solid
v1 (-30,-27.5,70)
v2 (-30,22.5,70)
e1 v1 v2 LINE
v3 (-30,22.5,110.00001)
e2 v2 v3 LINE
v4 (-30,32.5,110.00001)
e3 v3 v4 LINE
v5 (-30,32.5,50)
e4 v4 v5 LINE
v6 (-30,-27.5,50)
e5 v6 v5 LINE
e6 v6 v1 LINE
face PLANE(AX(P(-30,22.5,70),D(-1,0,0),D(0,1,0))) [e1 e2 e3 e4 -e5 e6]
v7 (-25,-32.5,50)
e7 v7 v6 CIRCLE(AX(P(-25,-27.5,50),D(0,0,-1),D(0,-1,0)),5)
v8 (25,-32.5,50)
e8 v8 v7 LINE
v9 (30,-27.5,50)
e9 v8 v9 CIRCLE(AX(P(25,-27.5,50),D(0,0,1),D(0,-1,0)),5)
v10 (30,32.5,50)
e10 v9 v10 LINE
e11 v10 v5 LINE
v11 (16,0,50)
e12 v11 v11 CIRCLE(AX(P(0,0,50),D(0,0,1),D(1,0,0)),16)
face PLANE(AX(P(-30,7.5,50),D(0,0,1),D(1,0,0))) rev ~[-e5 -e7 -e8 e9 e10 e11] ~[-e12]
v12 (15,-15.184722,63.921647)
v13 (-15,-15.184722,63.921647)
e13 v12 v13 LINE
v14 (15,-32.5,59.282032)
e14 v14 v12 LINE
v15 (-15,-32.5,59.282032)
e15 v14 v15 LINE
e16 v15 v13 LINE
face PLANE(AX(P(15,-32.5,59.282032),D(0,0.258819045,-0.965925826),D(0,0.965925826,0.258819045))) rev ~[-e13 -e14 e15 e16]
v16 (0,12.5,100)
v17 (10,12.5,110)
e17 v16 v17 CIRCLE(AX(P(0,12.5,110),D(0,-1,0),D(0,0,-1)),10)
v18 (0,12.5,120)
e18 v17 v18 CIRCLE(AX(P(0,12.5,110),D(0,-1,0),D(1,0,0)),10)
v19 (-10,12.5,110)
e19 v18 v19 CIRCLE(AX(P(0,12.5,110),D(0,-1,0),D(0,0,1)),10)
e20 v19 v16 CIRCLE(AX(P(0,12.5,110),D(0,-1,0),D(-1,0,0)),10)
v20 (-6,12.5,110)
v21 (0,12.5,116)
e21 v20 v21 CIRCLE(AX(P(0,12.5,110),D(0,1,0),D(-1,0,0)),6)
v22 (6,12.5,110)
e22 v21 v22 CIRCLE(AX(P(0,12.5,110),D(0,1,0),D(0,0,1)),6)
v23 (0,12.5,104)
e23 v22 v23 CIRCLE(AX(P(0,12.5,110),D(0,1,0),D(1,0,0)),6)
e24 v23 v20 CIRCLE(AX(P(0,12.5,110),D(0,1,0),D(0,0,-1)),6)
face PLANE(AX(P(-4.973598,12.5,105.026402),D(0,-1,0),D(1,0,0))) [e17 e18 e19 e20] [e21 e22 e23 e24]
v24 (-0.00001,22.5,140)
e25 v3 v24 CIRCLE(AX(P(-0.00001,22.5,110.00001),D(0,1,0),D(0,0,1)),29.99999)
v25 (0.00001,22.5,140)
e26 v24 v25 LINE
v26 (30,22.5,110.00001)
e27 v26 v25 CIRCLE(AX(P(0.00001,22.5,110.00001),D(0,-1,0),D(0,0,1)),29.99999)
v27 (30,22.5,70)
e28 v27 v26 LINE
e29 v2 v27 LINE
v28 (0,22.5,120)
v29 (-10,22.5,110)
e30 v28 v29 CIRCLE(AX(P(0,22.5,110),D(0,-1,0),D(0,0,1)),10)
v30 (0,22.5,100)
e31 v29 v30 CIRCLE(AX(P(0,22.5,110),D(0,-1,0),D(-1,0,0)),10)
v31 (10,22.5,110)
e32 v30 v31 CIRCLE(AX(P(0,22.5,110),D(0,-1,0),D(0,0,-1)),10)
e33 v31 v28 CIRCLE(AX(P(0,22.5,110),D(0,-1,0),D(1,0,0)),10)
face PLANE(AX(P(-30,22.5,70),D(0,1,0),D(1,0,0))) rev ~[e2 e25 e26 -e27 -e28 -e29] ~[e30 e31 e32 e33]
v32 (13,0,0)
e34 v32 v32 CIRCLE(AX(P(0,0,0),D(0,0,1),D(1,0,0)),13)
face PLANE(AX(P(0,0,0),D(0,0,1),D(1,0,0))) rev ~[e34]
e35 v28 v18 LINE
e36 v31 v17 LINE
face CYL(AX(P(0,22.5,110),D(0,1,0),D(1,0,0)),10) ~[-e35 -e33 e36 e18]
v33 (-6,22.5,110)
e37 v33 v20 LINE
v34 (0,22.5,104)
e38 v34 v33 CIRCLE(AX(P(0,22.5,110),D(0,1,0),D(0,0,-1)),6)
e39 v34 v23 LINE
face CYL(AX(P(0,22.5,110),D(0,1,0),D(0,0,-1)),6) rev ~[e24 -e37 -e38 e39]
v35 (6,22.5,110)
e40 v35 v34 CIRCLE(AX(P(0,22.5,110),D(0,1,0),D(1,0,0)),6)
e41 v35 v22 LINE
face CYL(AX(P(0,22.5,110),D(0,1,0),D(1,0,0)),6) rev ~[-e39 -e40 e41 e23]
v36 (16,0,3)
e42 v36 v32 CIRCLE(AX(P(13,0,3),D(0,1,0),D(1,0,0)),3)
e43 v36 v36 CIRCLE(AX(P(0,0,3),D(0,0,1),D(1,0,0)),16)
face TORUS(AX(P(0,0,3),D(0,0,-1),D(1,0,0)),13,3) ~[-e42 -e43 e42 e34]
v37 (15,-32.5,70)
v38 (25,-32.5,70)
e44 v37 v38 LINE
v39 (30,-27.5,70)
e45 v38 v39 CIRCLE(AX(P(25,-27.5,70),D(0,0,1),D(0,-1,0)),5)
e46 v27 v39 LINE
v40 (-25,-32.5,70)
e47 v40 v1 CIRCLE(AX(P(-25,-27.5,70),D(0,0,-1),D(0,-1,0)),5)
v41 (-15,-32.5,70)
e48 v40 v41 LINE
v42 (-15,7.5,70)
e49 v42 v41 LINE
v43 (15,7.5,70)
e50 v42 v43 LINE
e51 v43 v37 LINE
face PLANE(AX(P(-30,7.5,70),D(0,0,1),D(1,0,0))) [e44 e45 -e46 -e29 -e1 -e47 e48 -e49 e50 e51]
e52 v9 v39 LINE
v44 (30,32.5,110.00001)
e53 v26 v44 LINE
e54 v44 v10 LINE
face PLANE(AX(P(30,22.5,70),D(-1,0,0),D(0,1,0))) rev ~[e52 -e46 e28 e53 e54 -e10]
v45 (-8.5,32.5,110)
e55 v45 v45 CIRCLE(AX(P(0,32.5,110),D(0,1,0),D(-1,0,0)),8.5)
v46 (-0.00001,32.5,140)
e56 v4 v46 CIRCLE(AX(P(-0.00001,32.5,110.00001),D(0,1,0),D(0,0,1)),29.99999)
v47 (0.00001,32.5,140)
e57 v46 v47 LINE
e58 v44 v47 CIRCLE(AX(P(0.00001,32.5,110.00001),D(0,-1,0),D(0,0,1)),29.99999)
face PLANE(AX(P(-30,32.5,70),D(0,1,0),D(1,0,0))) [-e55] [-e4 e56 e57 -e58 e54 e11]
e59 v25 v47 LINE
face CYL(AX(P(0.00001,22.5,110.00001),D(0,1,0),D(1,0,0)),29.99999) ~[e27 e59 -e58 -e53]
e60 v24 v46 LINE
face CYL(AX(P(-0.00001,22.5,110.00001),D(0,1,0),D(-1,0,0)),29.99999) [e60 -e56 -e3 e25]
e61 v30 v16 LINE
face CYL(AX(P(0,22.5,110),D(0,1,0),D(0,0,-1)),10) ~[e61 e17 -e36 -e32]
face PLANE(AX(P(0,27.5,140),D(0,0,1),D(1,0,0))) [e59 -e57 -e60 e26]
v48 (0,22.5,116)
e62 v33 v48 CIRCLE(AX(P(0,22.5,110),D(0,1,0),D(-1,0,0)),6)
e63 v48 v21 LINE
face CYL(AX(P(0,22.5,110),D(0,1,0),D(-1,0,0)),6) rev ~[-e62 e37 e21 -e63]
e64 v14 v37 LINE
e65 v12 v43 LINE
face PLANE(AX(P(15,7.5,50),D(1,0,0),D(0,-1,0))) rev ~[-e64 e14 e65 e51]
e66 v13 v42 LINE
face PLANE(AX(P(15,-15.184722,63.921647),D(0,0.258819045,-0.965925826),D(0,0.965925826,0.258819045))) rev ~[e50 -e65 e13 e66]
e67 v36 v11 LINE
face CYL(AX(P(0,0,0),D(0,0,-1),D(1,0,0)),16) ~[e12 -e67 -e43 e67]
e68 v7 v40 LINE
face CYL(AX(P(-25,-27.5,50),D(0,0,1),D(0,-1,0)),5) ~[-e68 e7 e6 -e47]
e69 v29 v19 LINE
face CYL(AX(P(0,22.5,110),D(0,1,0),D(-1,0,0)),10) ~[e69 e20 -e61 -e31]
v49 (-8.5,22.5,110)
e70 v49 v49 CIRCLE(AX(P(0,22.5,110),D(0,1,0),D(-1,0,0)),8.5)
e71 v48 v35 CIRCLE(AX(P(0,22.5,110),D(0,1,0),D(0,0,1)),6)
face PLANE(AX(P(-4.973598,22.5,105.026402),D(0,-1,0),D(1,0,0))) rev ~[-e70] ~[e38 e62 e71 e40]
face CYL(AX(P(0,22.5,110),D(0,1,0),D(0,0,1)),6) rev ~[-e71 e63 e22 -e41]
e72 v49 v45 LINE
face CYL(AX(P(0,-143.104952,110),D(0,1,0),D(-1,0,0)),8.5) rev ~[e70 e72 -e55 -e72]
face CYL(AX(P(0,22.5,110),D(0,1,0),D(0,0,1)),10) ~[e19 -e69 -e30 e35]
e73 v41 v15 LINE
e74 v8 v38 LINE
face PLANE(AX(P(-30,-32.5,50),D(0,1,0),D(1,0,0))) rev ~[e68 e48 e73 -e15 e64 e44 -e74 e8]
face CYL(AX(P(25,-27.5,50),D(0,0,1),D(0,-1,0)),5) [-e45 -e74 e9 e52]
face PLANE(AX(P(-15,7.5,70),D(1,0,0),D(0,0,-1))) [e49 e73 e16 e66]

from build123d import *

# Parameters (mm, degrees)
F0_R      = 16
F1_DEPTH  = 50
F3_DEPTH  = 20
F4_DEPTH  = 20
F6_DEPTH  = 30
F7_DEPTH  = 40
F8_W      = 60
F8_H      = 10
F9_DEPTH  = 70
F10_R     = 29.99999
F11_R     = 3
F12_R     = 5
F14_D     = 17
F15_DEPTH = 10


# Not quite as in the source:
# - a fillet or chamfer is up to 0.001 mm smaller than in the source, because OpenCascade refuses the exact size


with BuildPart() as f1:
    # F0 (on Top) → F1 (new body)
    with BuildSketch(Plane.XY):
        Circle(F0_R)
    extrude(amount=F1_DEPTH)

    # F2 (on face) → F3 (join)
    with BuildSketch(Plane.XY.offset(50)):
        with BuildLine():
            Line((-30, 32.5), (-30, 7.5))
            Line((-30, 7.5), (-14.1332940251, 7.5))
            ThreePointArc((-14.1332940251, 7.5), (0, 16), (14.1332940251, 7.5))
            Line((14.1332940251, 7.5), (15, 7.5))
            Line((15, 7.5), (30, 7.5))
            Line((30, 7.5), (30, 32.5))
            Line((30, 32.5), (0, 32.5))
            Line((0, 32.5), (-30, 32.5))
        make_face()
        with BuildLine():
            ThreePointArc((14.1332940251, 7.5), (0, 16), (-14.1332940251, 7.5))
            Line((-14.1332940251, 7.5), (14.1332940251, 7.5))
        make_face()
    extrude(amount=F3_DEPTH)

    # F2 (on face) → F4 (join)
    with BuildSketch(Plane.XY.offset(50)):
        with BuildLine():
            Line((15, 5.5677643628), (15, -5.5677643628))
            ThreePointArc((15, -5.5677643628), (15.748015748, -2.8284271247), (16, 0))
            ThreePointArc((16, 0), (15.748015748, 2.8284271247), (15, 5.5677643628))
        make_face()
        with BuildLine():
            ThreePointArc((16, 0), (15.748015748, -2.8284271247), (15, -5.5677643628))
            Line((15, -5.5677643628), (15, -32.5))
            Line((15, -32.5), (30, -32.5))
            Line((30, -32.5), (30, 0))
            Line((30, 0), (30, 7.5))
            Line((30, 7.5), (15, 7.5))
            Line((15, 7.5), (15, 5.5677643628))
            ThreePointArc((15, 5.5677643628), (15.748015748, 2.8284271247), (16, 0))
        make_face()
    extrude(amount=F4_DEPTH)

    # F5 (on face) → F6 (join)
    with BuildSketch(Plane(origin=(15, 0, 0), x_dir=(0, -1, 0), z_dir=(-1, 0, 0))):
        Polygon((3.8423609018, 66.9608235561), (-7.5, 70), (-7.5, 50), (-5.5677643628, 50), (5.5677643628, 50), (32.5, 50), (32.5, 59.2820323028), (15.1847218036, 63.9216471122), align=None)
    extrude(amount=F6_DEPTH)

    # F7 (add): a face of the model
    f7_faces = [f1.faces().sort_by_distance(p)[0] for p in [
        (-22.5, 7.5, 60),
    ]]
    extrude(f7_faces, amount=F7_DEPTH)

    # F8 (on face) → F9 (join)
    with BuildSketch(Plane.XY.offset(70)):
        with Locations((0, 27.5)):
            Rectangle(F8_W, F8_H)
    extrude(amount=F9_DEPTH)

    # F10 (radius 30 in the source; OpenCascade refuses exactly that, so slightly less here)
    f10_edges = [f1.edges().sort_by_distance(p)[0] for p in [
        (-30, 27.5, 140),
        (30, 27.5, 140),
    ]]
    fillet(f10_edges, radius=F10_R)

    # F11
    f11_edges = [f1.edges().sort_by_distance(p)[0] for p in [
        (-16, 0, 0),
    ]]
    fillet(f11_edges, radius=F11_R)

    # F12
    f12_edges = [f1.edges().sort_by_distance(p)[0] for p in [
        (-30, -32.5, 60),
        (30, -32.5, 60),
    ]]
    fillet(f12_edges, radius=F12_R)

    # F14 (through all)
    with Locations(Plane.XZ.offset(-22.5)):
        with Locations((0, 110)):
            Hole(F14_D / 2)

    # F13 (on face) → F15 (join)
    with BuildSketch(Plane.XZ.offset(-22.5)):
        with BuildLine():
            Line((-6, 110), (-10, 110))
            ThreePointArc((-10, 110), (-7.0710678119, 102.9289321881), (0, 100))
            Line((0, 100), (0, 104))
            ThreePointArc((0, 104), (-4.2426406871, 105.7573593129), (-6, 110))
        make_face()
        with BuildLine():
            Line((0, 116), (0, 120))
            ThreePointArc((0, 120), (-7.0710678119, 117.0710678119), (-10, 110))
            Line((-10, 110), (-6, 110))
            ThreePointArc((-6, 110), (-4.2426406871, 114.2426406871), (0, 116))
        make_face()
        with BuildLine():
            ThreePointArc((10, 110), (7.0710678119, 117.0710678119), (0, 120))
            Line((0, 120), (0, 116))
            ThreePointArc((0, 116), (4.2426406871, 114.2426406871), (6, 110))
            Line((6, 110), (10, 110))
        make_face()
        with BuildLine():
            ThreePointArc((0, 100), (7.0710678119, 102.9289321881), (10, 110))
            Line((10, 110), (6, 110))
            ThreePointArc((6, 110), (4.2426406871, 105.7573593129), (0, 104))
            Line((0, 104), (0, 100))
        make_face()
    extrude(amount=F15_DEPTH)


solid = f1.part
